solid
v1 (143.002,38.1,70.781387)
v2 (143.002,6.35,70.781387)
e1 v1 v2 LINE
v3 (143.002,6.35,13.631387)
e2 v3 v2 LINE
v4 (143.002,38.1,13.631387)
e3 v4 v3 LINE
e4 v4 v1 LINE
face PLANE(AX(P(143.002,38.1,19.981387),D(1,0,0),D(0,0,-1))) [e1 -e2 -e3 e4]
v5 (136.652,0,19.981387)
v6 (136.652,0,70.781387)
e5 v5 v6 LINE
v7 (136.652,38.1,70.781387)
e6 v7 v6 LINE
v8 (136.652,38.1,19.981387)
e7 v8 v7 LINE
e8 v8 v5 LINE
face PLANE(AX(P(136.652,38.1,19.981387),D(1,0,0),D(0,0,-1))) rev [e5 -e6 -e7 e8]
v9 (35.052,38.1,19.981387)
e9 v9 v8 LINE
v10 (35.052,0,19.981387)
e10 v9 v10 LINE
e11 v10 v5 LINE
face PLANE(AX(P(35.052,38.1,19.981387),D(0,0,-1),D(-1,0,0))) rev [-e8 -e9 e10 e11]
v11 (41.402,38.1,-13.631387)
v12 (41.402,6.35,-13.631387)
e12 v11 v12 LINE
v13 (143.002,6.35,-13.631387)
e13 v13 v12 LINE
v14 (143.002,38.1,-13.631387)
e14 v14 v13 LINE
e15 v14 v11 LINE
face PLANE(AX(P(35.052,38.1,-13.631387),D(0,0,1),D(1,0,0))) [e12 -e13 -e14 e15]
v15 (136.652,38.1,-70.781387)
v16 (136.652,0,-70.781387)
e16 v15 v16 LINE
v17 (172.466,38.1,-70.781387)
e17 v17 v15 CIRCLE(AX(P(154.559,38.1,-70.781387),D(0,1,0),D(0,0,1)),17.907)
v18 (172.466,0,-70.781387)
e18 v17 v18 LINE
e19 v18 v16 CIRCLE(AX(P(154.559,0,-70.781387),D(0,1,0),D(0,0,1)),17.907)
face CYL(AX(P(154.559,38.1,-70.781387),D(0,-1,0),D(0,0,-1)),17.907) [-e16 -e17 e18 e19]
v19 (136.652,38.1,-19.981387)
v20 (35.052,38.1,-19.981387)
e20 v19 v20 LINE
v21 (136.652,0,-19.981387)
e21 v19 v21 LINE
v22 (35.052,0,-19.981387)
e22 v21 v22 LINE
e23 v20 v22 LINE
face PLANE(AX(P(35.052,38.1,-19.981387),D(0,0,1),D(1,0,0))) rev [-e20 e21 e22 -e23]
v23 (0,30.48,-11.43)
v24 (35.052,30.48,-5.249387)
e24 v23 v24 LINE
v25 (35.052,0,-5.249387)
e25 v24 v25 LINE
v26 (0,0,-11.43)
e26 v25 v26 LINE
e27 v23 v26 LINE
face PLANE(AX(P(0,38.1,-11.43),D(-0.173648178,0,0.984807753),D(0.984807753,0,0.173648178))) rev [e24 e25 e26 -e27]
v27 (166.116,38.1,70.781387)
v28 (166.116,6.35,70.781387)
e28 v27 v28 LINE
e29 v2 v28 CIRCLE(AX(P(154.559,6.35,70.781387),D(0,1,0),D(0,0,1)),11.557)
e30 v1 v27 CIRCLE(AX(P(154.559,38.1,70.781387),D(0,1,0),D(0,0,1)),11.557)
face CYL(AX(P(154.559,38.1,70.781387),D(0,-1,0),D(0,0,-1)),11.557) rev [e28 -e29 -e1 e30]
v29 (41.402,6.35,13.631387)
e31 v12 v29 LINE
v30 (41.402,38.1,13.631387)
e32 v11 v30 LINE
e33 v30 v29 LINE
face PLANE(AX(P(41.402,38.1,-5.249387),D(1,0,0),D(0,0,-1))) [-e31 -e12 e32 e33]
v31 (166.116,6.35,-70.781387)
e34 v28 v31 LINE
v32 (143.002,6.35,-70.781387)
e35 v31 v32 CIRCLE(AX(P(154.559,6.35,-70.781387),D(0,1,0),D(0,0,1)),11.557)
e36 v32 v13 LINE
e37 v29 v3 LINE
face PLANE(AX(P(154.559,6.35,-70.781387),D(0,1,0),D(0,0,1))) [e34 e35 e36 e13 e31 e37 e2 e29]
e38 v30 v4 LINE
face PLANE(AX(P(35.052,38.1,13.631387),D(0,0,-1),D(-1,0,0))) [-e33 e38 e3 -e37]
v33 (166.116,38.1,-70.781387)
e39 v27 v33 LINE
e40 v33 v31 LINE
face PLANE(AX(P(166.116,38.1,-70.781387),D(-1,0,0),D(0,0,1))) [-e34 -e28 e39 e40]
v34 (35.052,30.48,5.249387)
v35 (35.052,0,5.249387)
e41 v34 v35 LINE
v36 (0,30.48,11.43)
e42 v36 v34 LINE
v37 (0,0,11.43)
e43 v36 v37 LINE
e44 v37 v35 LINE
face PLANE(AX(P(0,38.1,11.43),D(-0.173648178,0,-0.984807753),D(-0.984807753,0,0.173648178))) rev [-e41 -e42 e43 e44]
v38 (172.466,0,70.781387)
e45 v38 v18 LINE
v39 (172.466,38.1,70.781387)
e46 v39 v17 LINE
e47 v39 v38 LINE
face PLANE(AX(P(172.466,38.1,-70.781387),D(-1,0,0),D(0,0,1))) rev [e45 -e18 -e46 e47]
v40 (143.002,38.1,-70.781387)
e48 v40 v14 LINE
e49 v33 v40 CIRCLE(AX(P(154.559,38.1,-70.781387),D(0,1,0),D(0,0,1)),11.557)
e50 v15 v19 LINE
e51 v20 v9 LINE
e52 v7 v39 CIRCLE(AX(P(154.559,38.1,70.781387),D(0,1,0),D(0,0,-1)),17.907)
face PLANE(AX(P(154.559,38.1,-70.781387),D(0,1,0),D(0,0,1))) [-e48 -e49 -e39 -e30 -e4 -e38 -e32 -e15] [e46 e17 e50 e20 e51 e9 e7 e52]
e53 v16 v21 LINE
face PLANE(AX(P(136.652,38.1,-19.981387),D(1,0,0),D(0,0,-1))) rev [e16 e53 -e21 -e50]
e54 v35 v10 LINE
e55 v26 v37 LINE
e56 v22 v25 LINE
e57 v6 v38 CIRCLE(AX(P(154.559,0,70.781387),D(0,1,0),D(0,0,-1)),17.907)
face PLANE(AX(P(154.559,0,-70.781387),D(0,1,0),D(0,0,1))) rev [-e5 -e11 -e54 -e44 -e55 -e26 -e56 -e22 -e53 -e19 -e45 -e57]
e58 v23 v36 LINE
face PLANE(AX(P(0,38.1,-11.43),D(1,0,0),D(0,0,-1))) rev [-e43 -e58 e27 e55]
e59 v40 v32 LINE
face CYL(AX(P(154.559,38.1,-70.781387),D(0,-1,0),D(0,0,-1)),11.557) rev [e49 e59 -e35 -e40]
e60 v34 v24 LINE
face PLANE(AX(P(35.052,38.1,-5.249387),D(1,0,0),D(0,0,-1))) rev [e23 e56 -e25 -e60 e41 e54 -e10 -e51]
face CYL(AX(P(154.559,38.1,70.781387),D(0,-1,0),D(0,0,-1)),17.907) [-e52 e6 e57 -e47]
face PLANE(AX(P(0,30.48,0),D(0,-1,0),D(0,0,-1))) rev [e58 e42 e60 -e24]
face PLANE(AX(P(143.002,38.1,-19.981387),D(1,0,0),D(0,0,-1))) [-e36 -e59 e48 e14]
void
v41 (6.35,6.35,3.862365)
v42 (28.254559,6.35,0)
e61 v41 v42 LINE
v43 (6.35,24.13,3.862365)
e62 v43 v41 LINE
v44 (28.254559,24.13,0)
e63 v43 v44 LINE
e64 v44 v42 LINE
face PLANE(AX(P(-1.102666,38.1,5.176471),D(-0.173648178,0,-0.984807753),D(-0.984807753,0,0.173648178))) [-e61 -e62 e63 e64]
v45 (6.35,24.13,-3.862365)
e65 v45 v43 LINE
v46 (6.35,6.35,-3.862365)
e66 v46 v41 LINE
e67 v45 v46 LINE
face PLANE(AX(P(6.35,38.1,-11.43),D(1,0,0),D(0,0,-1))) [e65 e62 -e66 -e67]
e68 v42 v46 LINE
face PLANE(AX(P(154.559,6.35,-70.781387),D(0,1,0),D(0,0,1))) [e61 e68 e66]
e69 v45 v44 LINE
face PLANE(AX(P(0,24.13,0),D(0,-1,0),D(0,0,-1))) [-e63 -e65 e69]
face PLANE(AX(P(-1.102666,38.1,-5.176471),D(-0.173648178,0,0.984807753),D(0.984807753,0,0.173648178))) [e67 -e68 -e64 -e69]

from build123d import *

# Parameters (mm, degrees)
BOSS_EXTRUDE1_DEPTH = 38.1
CUT_EXTRUDE10_DEPTH = 7.62
SHELL2_START        = 6.35
SHELL2_DEPTH        = 31.75
SHELL2_2_DEPTH      = 17.78


# Read off the part's stored shape, not the designer's step: Shell2
with BuildPart() as part:
    # Sketch1 → Boss-Extrude1 (new body)
    with BuildSketch(Plane(origin=(0, 0, 0), x_dir=(1, 0, 0), z_dir=(0, 1, 0))):
        with BuildLine():
            Line((0, 11.43), (0, -11.43))
            Line((0, -11.43), (35.052, -5.249386672))
            Line((35.052, -5.249386672), (35.052, -19.981386672))
            Line((35.052, -19.981386672), (136.652, -19.981386672))
            Line((136.652, -19.981386672), (136.652, -70.781386672))
            ThreePointArc((136.652, -70.781386672), (154.559, -88.688386672), (172.466, -70.781386672))
            Line((172.466, -70.781386672), (172.466, 70.781386672))
            ThreePointArc((172.466, 70.781386672), (154.559, 88.688386672), (136.652, 70.781386672))
            Line((136.652, 70.781386672), (136.652, 19.981386672))
            Line((136.652, 19.981386672), (35.052, 19.981386672))
            Line((35.052, 19.981386672), (35.052, 5.249386672))
            Line((35.052, 5.249386672), (0, 11.43))
        make_face()
    extrude(amount=BOSS_EXTRUDE1_DEPTH)

    # Sketch5 → Cut-Extrude10 (cut)
    with BuildSketch(Plane(origin=(0, 38.1, 0), x_dir=(1, 0, 0), z_dir=(0, 1, 0))):
        Polygon((0, -11.43), (0, 11.43), (0.210478784, 11.603037745), (35.052, 5.249386672), (35.052, -5.249386672), align=None)
    extrude(amount=-CUT_EXTRUDE10_DEPTH, mode=Mode.SUBTRACT)

    # Shell2 outline → Shell2 (cut)
    with BuildSketch(Plane(origin=(0, 0, 0), x_dir=(1, 0, 0), z_dir=(0, 1, 0)).offset(SHELL2_START)):
        with BuildLine():
            Line((41.402, 13.631386672), (41.402, -13.631386672))
            Line((41.402, -13.631386672), (143.002, -13.631386672))
            Line((143.002, -13.631386672), (143.002, -70.781386672))
            ThreePointArc((143.002, -70.781386672), (154.559, -82.338386672), (166.116, -70.781386672))
            Line((166.116, -70.781386672), (166.116, 70.781386672))
            ThreePointArc((166.116, 70.781386672), (154.559, 82.338386672), (143.002, 70.781386672))
            Line((143.002, 70.781386672), (143.002, 13.631386672))
            Line((143.002, 13.631386672), (41.402, 13.631386672))
        make_face()
    extrude(amount=SHELL2_DEPTH, mode=Mode.SUBTRACT)

    # Shell2 2 outline → Shell2 2 (cut)
    with BuildSketch(Plane(origin=(0, 0, 0), x_dir=(1, 0, 0), z_dir=(0, 1, 0)).offset(SHELL2_START)):
        Polygon((28.25455863, 0), (6.35, 3.862364687), (6.35, -3.862364687), align=None)
    extrude(amount=SHELL2_2_DEPTH, mode=Mode.SUBTRACT)


solid = part.part
